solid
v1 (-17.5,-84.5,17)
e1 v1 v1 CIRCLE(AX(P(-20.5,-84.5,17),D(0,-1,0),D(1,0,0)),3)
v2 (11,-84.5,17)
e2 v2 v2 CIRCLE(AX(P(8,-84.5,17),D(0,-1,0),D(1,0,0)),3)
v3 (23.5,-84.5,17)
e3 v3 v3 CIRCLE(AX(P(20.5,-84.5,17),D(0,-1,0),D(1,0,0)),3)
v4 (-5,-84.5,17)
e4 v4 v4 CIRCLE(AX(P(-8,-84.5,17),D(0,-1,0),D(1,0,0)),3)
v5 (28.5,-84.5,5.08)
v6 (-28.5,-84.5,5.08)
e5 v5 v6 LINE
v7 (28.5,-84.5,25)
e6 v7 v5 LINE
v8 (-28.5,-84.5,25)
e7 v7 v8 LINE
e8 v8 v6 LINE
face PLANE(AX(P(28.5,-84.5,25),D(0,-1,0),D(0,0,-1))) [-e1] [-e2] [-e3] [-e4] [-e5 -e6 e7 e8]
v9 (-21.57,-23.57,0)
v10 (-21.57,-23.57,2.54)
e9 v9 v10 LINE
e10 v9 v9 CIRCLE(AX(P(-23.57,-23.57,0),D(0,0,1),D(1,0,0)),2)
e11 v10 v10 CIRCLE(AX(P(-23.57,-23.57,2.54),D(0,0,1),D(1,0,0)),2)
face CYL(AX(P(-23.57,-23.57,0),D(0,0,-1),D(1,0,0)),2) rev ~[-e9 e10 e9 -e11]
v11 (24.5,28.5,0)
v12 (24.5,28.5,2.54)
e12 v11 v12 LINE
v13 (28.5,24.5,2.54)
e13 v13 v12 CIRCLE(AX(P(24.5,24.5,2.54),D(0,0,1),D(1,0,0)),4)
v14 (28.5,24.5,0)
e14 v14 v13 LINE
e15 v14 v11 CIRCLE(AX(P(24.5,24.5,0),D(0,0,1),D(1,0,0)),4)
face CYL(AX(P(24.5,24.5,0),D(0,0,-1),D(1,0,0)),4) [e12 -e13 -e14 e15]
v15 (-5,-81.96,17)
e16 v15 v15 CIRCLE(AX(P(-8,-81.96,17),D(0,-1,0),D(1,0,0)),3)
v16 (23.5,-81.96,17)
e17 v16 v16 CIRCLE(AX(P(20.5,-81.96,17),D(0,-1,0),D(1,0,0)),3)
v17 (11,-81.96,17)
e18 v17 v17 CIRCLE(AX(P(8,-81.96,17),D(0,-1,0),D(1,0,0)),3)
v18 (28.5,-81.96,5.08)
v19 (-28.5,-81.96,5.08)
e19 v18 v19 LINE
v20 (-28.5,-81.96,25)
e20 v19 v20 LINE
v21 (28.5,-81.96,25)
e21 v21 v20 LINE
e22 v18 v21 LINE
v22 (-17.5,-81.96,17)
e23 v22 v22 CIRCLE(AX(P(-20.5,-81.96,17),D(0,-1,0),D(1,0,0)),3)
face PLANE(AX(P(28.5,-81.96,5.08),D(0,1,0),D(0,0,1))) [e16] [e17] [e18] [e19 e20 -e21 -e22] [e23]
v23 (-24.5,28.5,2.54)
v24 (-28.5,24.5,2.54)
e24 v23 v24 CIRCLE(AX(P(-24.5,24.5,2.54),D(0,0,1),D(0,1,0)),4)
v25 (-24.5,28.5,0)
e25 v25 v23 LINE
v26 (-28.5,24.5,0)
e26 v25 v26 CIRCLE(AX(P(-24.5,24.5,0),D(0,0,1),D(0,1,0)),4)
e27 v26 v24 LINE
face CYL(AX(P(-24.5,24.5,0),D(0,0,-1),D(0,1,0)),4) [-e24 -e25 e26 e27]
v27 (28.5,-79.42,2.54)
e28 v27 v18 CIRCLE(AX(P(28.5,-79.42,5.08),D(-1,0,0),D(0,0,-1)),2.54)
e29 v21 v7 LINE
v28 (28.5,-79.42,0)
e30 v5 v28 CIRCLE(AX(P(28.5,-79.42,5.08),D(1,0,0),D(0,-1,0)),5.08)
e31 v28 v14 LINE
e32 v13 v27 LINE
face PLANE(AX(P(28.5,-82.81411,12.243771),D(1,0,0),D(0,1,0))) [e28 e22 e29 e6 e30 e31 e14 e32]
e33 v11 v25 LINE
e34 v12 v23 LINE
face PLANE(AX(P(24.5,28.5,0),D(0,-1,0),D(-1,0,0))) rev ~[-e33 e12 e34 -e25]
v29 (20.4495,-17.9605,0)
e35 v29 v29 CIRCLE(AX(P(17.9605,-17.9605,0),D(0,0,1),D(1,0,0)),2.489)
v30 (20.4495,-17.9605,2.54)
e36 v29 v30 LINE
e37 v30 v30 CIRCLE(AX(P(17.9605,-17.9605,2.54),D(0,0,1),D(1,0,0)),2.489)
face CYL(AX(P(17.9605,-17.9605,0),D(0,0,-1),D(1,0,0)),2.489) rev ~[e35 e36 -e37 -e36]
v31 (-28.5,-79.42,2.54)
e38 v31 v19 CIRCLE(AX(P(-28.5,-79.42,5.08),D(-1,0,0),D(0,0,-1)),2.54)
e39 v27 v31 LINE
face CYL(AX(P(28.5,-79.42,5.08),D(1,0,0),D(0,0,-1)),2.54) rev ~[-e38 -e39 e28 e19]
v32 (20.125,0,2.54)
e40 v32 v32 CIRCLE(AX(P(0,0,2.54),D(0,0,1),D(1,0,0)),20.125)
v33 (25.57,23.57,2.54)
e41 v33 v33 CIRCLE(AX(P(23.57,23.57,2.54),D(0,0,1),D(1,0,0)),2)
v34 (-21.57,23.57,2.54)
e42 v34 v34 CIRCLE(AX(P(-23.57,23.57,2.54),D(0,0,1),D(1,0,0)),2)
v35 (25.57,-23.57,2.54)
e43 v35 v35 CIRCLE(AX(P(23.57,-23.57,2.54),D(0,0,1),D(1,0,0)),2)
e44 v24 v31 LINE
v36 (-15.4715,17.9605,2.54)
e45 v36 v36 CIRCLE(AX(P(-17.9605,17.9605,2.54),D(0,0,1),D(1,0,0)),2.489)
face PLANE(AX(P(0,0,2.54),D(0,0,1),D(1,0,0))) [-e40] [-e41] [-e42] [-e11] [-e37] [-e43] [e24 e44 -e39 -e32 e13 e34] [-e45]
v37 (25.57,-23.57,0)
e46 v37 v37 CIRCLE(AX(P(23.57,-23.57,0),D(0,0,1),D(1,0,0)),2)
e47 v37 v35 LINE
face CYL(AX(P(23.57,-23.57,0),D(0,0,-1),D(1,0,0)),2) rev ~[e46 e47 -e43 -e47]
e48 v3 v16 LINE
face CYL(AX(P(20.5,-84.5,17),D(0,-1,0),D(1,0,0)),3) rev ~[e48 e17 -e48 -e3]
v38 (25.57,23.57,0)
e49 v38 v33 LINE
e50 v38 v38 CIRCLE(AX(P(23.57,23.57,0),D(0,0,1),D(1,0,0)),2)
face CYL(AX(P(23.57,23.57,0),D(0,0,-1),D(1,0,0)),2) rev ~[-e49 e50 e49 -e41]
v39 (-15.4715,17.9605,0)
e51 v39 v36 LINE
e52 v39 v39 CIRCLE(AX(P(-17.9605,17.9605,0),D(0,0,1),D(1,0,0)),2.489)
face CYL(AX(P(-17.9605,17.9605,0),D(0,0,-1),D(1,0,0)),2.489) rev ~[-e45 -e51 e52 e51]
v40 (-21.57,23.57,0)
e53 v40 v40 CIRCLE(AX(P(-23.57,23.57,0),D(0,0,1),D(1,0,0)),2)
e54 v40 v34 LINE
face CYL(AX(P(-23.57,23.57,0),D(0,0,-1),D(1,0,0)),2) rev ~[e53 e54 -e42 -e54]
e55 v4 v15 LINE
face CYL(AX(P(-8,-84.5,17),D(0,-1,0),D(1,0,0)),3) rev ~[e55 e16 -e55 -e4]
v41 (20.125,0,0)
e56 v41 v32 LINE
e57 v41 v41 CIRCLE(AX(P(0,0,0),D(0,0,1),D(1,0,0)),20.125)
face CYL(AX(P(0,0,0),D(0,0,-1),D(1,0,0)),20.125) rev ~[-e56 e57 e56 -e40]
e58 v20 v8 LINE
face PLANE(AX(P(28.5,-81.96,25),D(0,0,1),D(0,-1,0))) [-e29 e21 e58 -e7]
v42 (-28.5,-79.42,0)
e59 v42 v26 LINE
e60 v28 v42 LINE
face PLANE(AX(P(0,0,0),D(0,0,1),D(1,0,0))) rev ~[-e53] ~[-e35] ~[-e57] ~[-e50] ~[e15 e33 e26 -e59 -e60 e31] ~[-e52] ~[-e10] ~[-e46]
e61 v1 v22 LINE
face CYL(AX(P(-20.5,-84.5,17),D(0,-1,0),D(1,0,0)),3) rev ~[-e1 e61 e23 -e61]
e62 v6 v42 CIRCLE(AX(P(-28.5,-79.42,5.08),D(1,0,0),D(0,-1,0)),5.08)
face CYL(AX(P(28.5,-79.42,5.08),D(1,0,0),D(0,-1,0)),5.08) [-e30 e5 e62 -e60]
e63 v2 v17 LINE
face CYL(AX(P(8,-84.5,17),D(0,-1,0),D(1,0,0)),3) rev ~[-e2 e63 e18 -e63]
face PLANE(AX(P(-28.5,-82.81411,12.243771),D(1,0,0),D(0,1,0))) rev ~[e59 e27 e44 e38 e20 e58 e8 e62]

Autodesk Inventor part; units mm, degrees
ref_plane "YZ Plane" through (0, 0, 0) normal (1, 0, 0) x (0, 1, 0)
ref_plane "XZ Plane" through (0, 0, 0) normal (0, 1, 0) x (-1, 0, 0)
ref_plane "XY Plane" through (0, 0, 0) normal (0, 0, 1) x (1, 0, 0)
sketch "Base" plane through (0, 0, 0) normal (0, 0, 1) x (1, 0, 0)
  circle A0 centre (0, 0) radius 19.125 construction
  arc A1 (28.5, 24.5) -> (24.5, 28.5) centre (24.5, 24.5) ccw
  line L0 (24.5, 28.5) -> (-24.5, 28.5)
  arc A2 (-24.5, 28.5) -> (-28.5, 24.5) centre (-24.5, 24.5) ccw
  line L1 (-28.5, 24.5) -> (-28.5, -24.5)
  arc A3 (-28.5, -24.5) -> (-24.5, -28.5) centre (-24.5, -24.5) ccw
  line L2 (-24.5, -28.5) -> (24.5, -28.5)
  arc A4 (24.5, -28.5) -> (28.5, -24.5) centre (24.5, -24.5) ccw
  line L3 (28.5, -24.5) -> (28.5, 24.5)
  circle A5 centre (-23.57, 23.57) radius 2
  circle A6 centre (23.57, 23.57) radius 2
  circle A7 centre (-23.57, -23.57) radius 2
  circle A8 centre (23.57, -23.57) radius 2
  circle A9 centre (0, 0) radius 20.125
  circle A10 centre (-17.9605, 17.9605) radius 2.489
  circle A11 centre (17.9605, -17.9605) radius 2.489
  point P0 (0, 0)
  dimension "d0" = 1
extrude "Plate1" add sketch "Base" along normal blind 2.54
sketch "Sketch2" plane through (0, 0, 2.54) normal (0, 0, 1) x (1, 0, 0)
  line L0 (28.5, -24.5) -> (28.5, 24.5)
  line L1 (28.5, -24.5) -> (28.5, -84.5)
  line L2 (-28.5, 24.5) -> (-28.5, -24.5)
  line L3 (-28.5, -24.5) -> (-28.5, -84.5)
  line L4 (28.5, -84.5) -> (-28.5, -84.5)
  arc A0 (24.5, -28.5) -> (28.5, -24.5) centre (24.5, -24.5) ccw
  line L5 (24.5, -28.5) -> (-24.5, -28.5)
  arc A1 (-28.5, -24.5) -> (-24.5, -28.5) centre (-24.5, -24.5) ccw
  point P0 (0, 0)
  dimension "d2" = 60
sheet face with bend "Face2" sketch "Sketch2" thickness 2.54 toward (0, 0, -1) bend radius 2.54
bend "Bend1"
sketch "Sketch3" plane through (28.5, -81.96, 0) normal (0, -1, 0) x (1, 0, 0)
  line L0 (-57, 0) -> (0, 0)
  line L1 (0, 0) -> (0, 25)
  line L2 (0, 25) -> (-57, 25)
  line L3 (-57, 25) -> (-57, 0)
edge flange "Flange1" height 25 angle 90 thickness 2.54 bend radius 2.54 thickness toward (0, -1, 0) relief tear relief width 2.54 relief depth 1.27 edges at (0, -84.5, 2.54) wall of the first edge with corners at (-28.5, -81.96, 0) (28.5, -81.96, 0) (28.5, -81.96, 25) (-28.5, -81.96, 25)
bend "Bend2"
corner "Corner1"
sketch "Sketch4" plane through (-28.5, -84.5, 25) normal (0, -1, 0) x (1, 0, 0)
  line L0 (0, 0) -> (57, 0) construction
  line L1 (28.5, 0) -> (28.5, -19.92) construction
  line L2 (57, -19.92) -> (0, -19.92) construction
  circle A0 centre (8, -8) radius 3
  circle A1 centre (49, -8) radius 3
  line L3 (0, -19.92) -> (0, 0) projected
  circle A2 centre (20.5, -8) radius 3
  circle A3 centre (36.5, -8) radius 3
  point P0 (28.5, -25)
  dimension "d18" = 6
  dimension "d19" = 8
  dimension "d20" = 8
  dimension "d21" = 8
  dimension "d22" = 8
  dimension "d25" = 12.5
extrude "Cut1" cut sketch "Sketch4" against normal blind 2.54
equation "\"d22\" = d19"
equation "\"d23\" = Thickness"
equation "\"d1\" = Thickness"
equation "\"d3\" = BendRadius"
equation "\"d4\" = BendReliefWidth"
equation "\"d6\" = MinimumRemnant"
equation "\"d5\" = BendReliefDepth"
equation "\"d7\" = TransitionRadius"
equation "\"d8\" = BendReliefWidth"
equation "\"d9\" = BendReliefDepth"
equation "\"d10\" = MinimumRemnant"
equation "\"d11\" = TransitionRadius"
equation "\"d14\" = BendRadius"
equation "\"d15\" = CornerReliefSize"
equation "\"d16\" = GapSize"
equation "\"d17\" = JacobiRadiusSize"
equation "\"BendRadius\" = Thickness"
equation "\"BendReliefWidth\" = Thickness"
equation "\"BendReliefDepth\" = 0.5 * Thickness"
equation "\"CornerReliefSize\" = 4 * Thickness"
equation "\"MinimumRemnant\" = 2 * Thickness"
equation "\"TransitionRadius\" = BendRadius"
equation "\"JacobiRadiusSize\" = BendRadius"
equation "\"GapSize\" = Thickness"
equation "\"Thickness\" = 2.54"
properties part number "NeckStepperCover"
